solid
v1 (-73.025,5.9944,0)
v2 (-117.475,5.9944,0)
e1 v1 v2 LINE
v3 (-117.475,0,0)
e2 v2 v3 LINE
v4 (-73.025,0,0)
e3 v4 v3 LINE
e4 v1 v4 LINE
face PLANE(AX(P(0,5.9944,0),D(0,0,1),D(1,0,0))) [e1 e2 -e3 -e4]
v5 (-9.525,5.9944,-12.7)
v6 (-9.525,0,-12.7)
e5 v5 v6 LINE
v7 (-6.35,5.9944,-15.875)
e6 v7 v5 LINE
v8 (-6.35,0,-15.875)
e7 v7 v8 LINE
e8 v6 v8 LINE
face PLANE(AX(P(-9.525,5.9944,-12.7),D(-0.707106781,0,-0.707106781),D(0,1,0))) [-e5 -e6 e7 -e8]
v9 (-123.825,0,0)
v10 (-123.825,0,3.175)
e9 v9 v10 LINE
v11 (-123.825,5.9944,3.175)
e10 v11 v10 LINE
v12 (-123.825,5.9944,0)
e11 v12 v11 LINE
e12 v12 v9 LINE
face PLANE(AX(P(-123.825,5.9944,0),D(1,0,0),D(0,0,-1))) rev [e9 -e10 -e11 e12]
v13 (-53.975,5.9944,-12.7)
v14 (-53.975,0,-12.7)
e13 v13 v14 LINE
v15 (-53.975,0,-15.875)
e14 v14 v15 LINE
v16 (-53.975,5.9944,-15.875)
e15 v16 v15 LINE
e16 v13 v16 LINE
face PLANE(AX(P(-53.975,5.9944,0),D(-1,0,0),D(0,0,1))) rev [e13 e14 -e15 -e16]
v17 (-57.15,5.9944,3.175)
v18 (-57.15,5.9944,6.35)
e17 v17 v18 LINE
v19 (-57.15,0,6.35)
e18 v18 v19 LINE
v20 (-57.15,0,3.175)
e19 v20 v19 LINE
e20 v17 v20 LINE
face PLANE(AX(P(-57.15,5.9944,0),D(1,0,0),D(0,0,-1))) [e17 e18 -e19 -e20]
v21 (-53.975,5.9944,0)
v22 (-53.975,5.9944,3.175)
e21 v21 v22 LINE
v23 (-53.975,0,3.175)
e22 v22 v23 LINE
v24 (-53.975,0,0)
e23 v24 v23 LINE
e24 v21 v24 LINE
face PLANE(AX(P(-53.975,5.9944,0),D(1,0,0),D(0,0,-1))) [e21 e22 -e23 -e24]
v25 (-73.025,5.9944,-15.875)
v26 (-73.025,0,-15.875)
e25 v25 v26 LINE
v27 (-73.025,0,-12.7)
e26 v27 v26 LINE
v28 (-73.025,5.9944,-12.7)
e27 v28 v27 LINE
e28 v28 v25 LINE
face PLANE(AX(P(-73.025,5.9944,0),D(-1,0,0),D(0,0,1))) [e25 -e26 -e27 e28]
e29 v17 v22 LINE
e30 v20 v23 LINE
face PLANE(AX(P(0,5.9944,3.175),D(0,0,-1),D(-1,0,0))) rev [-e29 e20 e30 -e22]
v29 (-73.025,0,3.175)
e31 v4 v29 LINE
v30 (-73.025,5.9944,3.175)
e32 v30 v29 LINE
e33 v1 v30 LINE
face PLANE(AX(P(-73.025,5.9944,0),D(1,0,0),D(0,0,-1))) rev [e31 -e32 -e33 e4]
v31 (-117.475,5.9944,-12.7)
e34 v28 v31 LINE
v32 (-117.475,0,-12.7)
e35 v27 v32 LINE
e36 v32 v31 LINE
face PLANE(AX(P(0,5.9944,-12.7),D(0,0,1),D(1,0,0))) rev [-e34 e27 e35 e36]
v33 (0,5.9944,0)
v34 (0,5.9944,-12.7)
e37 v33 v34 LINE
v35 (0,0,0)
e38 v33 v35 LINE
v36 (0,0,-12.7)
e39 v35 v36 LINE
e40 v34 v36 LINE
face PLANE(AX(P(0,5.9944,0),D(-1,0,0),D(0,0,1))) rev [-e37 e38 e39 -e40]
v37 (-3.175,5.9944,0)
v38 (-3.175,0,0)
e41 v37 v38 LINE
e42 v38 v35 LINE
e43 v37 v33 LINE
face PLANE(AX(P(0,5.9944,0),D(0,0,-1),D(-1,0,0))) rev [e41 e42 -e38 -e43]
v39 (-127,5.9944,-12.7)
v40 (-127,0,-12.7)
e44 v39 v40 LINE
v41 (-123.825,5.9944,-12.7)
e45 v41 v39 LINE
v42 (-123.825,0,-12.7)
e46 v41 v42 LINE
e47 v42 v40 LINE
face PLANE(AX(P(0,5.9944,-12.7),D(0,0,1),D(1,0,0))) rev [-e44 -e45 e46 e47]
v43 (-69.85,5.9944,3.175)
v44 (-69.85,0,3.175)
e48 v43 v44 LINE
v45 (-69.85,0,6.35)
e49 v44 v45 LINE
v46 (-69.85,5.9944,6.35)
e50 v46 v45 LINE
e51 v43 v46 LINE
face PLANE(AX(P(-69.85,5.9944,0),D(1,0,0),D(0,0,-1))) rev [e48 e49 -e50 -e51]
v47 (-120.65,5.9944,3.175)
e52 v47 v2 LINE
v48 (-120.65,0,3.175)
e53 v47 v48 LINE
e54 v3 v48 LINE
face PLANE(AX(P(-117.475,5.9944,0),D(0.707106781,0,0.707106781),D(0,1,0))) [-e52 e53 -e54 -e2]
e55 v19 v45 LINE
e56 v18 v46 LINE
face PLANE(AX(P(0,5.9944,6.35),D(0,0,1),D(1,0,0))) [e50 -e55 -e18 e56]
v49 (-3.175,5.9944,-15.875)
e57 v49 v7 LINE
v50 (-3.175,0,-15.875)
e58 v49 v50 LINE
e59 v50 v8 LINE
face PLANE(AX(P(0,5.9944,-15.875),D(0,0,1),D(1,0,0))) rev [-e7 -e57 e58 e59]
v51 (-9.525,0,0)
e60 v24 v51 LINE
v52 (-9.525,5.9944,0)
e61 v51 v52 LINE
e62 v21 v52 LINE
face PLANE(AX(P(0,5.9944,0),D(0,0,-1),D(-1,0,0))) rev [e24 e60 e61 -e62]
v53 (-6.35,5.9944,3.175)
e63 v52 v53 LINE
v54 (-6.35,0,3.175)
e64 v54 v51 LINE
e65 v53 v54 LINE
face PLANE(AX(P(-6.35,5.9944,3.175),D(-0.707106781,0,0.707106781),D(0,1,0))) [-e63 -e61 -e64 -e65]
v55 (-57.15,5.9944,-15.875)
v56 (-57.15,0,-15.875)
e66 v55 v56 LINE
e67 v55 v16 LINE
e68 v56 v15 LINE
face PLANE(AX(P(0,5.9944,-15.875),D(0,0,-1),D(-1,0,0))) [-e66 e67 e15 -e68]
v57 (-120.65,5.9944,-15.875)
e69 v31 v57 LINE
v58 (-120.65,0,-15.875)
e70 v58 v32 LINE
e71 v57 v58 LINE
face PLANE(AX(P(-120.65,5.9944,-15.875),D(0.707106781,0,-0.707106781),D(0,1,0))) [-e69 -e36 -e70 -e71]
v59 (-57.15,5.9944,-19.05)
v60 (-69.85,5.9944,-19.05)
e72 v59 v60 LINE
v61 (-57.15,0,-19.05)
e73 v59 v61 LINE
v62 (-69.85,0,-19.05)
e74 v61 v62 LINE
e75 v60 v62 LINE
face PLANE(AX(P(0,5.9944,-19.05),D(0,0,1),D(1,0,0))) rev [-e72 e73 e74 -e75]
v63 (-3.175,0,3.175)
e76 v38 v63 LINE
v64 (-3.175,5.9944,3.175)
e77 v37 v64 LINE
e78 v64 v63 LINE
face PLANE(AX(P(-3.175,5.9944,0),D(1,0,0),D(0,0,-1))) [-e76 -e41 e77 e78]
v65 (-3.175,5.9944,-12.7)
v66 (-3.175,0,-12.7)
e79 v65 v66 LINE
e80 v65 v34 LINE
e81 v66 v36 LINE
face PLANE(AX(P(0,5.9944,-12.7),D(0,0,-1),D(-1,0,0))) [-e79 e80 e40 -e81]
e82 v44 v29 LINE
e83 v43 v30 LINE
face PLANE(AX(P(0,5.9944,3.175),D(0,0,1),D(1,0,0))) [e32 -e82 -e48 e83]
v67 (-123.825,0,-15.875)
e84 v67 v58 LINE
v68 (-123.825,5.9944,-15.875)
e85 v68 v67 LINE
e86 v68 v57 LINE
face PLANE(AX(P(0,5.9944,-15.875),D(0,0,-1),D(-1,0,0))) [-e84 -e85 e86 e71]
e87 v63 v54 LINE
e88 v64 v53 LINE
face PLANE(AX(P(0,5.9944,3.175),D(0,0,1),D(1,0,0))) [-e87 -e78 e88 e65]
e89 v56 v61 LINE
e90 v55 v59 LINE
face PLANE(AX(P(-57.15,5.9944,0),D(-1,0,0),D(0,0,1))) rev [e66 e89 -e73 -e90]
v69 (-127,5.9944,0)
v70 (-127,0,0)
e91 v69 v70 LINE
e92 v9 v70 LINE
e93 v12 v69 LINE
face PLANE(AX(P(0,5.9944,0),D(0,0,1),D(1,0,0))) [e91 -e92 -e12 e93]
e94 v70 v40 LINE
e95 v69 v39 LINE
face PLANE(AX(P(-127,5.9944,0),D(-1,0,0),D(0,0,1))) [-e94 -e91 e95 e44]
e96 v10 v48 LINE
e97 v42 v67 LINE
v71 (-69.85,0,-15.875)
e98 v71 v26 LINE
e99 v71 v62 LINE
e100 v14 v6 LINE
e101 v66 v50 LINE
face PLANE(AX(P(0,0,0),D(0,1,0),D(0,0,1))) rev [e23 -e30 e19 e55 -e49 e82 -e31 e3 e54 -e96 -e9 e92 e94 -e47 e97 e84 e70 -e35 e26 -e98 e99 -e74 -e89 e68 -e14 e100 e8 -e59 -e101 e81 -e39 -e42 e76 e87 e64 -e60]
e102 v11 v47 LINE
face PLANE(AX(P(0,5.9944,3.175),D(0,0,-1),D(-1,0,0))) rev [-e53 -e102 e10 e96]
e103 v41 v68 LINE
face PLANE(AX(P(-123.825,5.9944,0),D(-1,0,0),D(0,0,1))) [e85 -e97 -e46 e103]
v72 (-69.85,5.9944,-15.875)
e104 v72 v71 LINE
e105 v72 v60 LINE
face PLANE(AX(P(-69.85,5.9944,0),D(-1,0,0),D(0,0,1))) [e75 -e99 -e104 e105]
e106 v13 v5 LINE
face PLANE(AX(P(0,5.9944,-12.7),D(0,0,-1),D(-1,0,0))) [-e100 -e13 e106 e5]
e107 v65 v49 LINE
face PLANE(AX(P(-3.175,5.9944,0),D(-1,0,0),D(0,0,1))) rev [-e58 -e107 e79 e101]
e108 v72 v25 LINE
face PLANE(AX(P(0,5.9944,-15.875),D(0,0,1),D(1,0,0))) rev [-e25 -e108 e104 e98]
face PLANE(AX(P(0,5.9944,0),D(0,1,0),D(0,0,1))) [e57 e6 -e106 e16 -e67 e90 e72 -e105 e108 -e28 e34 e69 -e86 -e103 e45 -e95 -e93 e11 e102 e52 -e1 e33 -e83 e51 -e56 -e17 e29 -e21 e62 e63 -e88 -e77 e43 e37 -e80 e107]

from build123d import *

# Parameters (mm, degrees)
BOSS_EXTRUDE1_DEPTH = 5.9944
CHAMFER1_SIZE       = 3.175


with BuildPart() as part:
    # Sketch1 → Boss-Extrude1 (new body)
    with BuildSketch(Plane(origin=(0, 0, 0), x_dir=(1, 0, 0), z_dir=(0, 1, 0))):
        Polygon((-53.975, 0), (-6.35, 0), (-6.35, -3.175), (-3.175, -3.175), (-3.175, 0), (0, 0), (0, 12.7), (-3.175, 12.7), (-3.175, 15.875), (-6.35, 15.875), (-6.35, 12.7), (-53.975, 12.7), (-53.975, 15.875), (-57.15, 15.875), (-57.15, 19.05), (-69.85, 19.05), (-69.85, 15.875), (-73.025, 15.875), (-73.025, 12.7), (-120.65, 12.7), (-120.65, 15.875), (-123.825, 15.875), (-123.825, 12.7), (-127, 12.7), (-127, 0), (-123.825, 0), (-123.825, -3.175), (-120.65, -3.175), (-120.65, 0), (-73.025, 0), (-73.025, -3.175), (-69.85, -3.175), (-69.85, -6.35), (-57.15, -6.35), (-57.15, -3.175), (-53.975, -3.175), align=None)
    extrude(amount=BOSS_EXTRUDE1_DEPTH)

    # Chamfer1
    chamfer1_edges = [part.edges().sort_by_distance(p)[0] for p in [
        (-6.35, 2.9972, -12.7),
        (-6.35, 2.9972, 0),
        (-120.65, 2.9972, 0),
        (-120.65, 2.9972, -12.7),
    ]]
    chamfer(chamfer1_edges, length=CHAMFER1_SIZE - 0.0001)  # a hair under: the kernel refuses the full size


solid = part.part
